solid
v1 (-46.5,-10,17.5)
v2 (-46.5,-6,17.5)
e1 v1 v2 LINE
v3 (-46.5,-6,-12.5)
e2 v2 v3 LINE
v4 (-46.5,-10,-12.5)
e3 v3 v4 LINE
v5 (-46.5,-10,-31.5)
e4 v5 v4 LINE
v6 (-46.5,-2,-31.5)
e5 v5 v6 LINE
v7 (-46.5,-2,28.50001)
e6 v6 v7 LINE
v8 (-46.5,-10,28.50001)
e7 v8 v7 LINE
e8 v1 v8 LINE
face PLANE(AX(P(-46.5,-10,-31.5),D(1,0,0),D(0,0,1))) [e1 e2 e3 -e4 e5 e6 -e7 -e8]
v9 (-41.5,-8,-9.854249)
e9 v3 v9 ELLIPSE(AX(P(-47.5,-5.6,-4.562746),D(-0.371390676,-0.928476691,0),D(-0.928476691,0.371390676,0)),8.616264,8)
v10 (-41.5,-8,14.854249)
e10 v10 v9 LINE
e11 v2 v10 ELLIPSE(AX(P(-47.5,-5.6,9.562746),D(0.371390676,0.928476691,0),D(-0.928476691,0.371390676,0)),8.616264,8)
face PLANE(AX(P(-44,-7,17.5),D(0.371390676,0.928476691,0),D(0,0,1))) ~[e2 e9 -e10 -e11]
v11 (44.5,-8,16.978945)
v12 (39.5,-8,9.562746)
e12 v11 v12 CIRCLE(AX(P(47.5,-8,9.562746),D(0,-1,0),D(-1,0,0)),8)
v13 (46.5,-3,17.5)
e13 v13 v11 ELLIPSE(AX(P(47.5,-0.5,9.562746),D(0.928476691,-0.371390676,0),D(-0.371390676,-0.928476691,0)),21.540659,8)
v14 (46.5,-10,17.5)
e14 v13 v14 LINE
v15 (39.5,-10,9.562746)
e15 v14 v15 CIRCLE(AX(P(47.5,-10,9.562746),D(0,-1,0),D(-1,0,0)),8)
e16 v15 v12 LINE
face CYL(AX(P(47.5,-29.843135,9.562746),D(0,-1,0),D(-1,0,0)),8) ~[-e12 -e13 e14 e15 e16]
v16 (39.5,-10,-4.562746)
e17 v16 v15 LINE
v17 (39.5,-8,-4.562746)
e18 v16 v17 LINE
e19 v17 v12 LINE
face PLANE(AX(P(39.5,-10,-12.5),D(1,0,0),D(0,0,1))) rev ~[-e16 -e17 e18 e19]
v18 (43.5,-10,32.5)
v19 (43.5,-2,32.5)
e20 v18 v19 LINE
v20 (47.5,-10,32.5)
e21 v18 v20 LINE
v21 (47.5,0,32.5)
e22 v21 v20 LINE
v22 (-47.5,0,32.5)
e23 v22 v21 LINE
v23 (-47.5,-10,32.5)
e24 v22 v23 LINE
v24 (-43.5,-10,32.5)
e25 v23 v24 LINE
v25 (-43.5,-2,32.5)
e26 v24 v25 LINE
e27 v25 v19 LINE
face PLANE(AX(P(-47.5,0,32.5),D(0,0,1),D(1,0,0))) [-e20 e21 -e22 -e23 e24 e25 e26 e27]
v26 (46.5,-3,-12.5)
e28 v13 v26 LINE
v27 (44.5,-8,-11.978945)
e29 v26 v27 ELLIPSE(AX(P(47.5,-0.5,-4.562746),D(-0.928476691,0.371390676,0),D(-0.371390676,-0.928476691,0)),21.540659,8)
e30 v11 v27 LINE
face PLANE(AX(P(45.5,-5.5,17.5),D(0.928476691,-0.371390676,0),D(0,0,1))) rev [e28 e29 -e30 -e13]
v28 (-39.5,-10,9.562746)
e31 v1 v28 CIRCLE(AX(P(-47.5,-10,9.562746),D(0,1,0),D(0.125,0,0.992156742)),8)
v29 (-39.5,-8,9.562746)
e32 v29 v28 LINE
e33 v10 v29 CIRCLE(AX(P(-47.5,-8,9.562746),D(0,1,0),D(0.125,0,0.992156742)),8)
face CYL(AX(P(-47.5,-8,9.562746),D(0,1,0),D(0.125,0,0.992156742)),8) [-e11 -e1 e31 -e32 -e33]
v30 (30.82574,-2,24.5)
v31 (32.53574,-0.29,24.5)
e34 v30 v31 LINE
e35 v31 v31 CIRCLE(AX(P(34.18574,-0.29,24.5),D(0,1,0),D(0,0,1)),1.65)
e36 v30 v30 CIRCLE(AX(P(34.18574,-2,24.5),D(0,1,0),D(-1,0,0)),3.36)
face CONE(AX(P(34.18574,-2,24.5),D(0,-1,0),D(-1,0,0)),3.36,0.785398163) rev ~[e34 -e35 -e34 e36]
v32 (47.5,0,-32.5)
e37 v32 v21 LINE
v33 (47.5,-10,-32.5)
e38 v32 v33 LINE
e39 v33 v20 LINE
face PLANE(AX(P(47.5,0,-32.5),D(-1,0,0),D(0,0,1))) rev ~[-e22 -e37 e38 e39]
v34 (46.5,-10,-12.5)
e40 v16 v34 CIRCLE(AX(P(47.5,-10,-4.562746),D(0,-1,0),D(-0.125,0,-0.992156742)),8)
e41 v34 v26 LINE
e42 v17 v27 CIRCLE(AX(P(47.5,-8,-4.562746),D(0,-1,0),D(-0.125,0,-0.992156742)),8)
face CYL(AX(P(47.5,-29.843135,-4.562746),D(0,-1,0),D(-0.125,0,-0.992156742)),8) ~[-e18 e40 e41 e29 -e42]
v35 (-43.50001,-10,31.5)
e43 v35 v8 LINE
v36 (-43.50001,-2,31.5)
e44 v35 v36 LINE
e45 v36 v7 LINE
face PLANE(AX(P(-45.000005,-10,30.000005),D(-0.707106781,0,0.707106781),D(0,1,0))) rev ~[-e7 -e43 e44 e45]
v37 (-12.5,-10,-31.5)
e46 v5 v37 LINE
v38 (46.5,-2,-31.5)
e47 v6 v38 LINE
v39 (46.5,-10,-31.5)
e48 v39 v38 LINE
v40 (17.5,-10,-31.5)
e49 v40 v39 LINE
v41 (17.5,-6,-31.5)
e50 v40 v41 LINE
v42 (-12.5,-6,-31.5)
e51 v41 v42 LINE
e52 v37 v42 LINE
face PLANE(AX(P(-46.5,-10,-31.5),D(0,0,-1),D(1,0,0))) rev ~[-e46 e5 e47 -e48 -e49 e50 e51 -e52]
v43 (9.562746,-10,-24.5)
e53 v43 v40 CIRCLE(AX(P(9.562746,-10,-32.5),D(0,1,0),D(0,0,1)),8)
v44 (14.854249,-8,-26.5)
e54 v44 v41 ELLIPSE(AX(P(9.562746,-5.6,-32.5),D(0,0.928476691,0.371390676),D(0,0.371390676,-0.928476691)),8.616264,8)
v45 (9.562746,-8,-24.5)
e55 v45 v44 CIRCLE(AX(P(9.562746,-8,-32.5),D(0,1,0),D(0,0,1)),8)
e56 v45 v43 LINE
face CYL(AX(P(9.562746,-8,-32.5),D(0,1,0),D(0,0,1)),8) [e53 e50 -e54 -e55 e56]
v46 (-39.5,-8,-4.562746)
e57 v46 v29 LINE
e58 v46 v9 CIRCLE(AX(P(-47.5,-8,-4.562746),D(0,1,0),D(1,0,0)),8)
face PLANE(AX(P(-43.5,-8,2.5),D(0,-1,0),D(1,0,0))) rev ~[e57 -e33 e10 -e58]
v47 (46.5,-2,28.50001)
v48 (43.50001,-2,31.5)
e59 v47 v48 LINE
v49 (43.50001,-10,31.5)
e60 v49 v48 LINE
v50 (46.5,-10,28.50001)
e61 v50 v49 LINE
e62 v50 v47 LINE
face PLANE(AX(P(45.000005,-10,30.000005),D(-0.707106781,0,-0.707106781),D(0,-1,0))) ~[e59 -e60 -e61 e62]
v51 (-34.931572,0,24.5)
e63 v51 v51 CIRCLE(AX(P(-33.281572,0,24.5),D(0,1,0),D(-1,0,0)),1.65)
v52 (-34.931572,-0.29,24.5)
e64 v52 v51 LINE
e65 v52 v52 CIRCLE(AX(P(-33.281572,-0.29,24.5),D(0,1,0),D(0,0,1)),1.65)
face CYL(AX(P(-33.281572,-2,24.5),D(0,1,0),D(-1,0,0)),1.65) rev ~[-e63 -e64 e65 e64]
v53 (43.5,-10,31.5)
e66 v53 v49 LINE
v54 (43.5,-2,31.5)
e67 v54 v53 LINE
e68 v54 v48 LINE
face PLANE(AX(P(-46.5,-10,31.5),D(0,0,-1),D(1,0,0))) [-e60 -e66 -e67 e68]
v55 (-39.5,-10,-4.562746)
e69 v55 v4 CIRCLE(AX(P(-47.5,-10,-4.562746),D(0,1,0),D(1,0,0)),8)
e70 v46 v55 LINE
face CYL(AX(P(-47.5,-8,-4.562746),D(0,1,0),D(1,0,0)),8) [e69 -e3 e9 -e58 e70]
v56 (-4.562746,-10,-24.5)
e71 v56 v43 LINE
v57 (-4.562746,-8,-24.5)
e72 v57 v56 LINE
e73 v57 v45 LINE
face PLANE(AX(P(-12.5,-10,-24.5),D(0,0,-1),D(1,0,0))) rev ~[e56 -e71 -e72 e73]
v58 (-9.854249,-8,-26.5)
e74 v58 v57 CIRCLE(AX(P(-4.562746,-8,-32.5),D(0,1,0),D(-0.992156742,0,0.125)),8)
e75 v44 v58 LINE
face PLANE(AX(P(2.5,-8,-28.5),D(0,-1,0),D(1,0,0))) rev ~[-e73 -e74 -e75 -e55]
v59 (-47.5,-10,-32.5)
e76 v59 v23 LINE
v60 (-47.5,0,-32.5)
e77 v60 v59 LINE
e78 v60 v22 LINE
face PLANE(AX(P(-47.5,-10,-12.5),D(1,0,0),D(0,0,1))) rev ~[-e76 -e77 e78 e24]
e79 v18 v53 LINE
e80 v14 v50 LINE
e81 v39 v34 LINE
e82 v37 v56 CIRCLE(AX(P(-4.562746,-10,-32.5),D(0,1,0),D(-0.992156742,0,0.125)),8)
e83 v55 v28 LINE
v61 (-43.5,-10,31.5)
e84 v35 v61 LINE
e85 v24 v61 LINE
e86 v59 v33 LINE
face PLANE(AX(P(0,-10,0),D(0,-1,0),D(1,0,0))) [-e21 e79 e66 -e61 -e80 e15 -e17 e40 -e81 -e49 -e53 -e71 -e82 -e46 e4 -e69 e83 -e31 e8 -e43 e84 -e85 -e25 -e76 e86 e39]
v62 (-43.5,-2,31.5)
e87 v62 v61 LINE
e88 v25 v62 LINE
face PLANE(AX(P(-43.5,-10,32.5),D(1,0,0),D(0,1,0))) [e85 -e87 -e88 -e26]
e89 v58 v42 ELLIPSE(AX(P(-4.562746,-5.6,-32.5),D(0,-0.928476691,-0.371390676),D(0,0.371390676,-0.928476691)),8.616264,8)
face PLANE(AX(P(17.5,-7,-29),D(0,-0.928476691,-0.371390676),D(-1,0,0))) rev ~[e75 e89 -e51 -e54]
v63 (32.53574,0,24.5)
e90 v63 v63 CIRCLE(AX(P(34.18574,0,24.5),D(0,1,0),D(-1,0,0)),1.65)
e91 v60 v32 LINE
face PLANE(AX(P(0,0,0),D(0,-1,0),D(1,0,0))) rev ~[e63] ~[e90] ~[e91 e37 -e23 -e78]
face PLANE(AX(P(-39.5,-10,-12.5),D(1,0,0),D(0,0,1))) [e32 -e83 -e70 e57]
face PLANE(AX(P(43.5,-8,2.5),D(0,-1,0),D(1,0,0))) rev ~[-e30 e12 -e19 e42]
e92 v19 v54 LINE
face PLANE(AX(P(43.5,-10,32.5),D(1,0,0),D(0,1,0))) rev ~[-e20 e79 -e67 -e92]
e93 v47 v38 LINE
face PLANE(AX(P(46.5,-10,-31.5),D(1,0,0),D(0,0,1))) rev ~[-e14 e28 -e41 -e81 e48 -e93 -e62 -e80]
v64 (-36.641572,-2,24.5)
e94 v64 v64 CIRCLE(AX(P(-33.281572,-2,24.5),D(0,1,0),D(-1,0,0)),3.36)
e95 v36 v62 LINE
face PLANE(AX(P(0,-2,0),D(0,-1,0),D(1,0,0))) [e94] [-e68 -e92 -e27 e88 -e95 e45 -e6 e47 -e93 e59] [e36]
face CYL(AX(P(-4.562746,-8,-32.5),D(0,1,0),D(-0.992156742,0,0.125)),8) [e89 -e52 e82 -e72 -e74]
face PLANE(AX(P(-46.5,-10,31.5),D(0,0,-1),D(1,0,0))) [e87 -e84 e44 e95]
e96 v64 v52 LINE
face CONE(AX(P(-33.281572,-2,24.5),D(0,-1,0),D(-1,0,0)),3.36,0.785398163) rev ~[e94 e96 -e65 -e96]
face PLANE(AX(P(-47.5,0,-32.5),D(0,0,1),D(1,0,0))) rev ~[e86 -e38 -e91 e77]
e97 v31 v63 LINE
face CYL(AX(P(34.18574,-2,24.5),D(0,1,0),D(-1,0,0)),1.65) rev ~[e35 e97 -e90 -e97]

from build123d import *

# Parameters (mm, degrees)
F0_W            = 95
F0_H            = 65
F1_DEPTH        = 10
F2_W            = 93
F2_H            = 63
F3_DEPTH        = 8
F4_W            = 8
F4_H            = 30
F4_W_2          = 30
F4_H_2          = 8
F5_DEPTH        = 2
F6_T1_DEPTH     = 21.843134833
F6_T6_DEPTH     = 41.686269666
F6_T11_DEPTH    = 41.686269666
F7_C1_SIZE2     = 2
F7_C1_SIZE      = 5
F7_C2_SIZE2     = 5
F7_C2_SIZE      = 2
F7_C3_SIZE2     = 2
F7_C3_SIZE      = 5
F8_W            = 87
F8_H            = 8
F9_DEPTH        = 10
F10_SIZE        = 2.99999
F12_D           = 3.3
F12_CSINK_D     = 6.72
F12_CSINK_ANGLE = 90


# Not quite as in the source:
# - a fillet or chamfer that OpenCascade refuses, or shapes differently, is made with other operations: its cross-section is extruded or revolved along the edge and cut away or added
# - a fillet or chamfer is up to 0.001 mm smaller than in the source, because OpenCascade refuses the exact size


with BuildPart() as f1:
    # F0 (on Front) → F1 (new body)
    with BuildSketch(Plane.XZ):
        Rectangle(F0_W, F0_H)
    extrude(amount=F1_DEPTH)

    # F2 (on face) → F3 (cut)
    with BuildSketch(Plane.XZ.offset(10)):
        Rectangle(F2_W, F2_H)
    extrude(amount=-F3_DEPTH, mode=Mode.SUBTRACT)

    # F4 (on face) → F5 (join)
    with BuildSketch(Plane.XZ.offset(10)):
        with Locations((-43.5, 2.5)):
            Rectangle(F4_W, F4_H)
        with Locations((43.5, 2.5)):
            Rectangle(F4_W, F4_H)
        with Locations((2.5, -28.5)):
            Rectangle(F4_W_2, F4_H_2)
    extrude(amount=-F5_DEPTH)

    # F6: fillet of radius 8 on 6 edges, made by hand

    # F6_s2 → F6_t1 (cut)
    with BuildSketch(Plane.XZ.offset(8)):
        with BuildLine():
            ThreePointArc((-39.5, -4.5627460668), (-41.5, -9.8542486889), (-46.5, -12.5))
            Line((-46.5, -12.5), (-39.5, -12.5))
            Line((-39.5, -12.5), (-39.5, -4.5627460668))
        make_face()
        with BuildLine():
            ThreePointArc((-46.5, 17.5), (-41.5, 14.8542486889), (-39.5, 9.5627460668))
            Line((-39.5, 9.5627460668), (-39.5, 17.5))
            Line((-39.5, 17.5), (-46.5, 17.5))
        make_face()
        with BuildLine():
            ThreePointArc((-12.5, -31.5), (-9.8542486889, -26.5), (-4.5627460668, -24.5))
            Line((-4.5627460668, -24.5), (-12.5, -24.5))
            Line((-12.5, -24.5), (-12.5, -31.5))
        make_face()
        with BuildLine():
            ThreePointArc((9.5627460668, -24.5), (14.8542486889, -26.5), (17.5, -31.5))
            Line((17.5, -31.5), (17.5, -24.5))
            Line((17.5, -24.5), (9.5627460668, -24.5))
        make_face()
    extrude(amount=F6_T1_DEPTH, mode=Mode.SUBTRACT)


with BuildPart() as f6_tool4:
    # F6_s5 → F6_t6 (new body)
    with BuildSketch(Plane.XZ.offset(29.843134833)):
        with BuildLine():
            ThreePointArc((39.5, 9.5627460668), (41.5, 14.8542486889), (46.5, 17.5))
            Line((46.5, 17.5), (39.5, 17.5))
            Line((39.5, 17.5), (39.5, 9.5627460668))
        make_face()
    extrude(amount=-F6_T6_DEPTH)

    split(bisect_by=Plane.XZ.offset(2), keep=Keep.TOP)


with BuildPart() as f1_1:
    add(f1.part)

    # F6_t3: cut F6_tool4
    add(f6_tool4.part, mode=Mode.SUBTRACT)


with BuildPart() as f6_tool9:
    # F6_s10 → F6_t11 (new body)
    with BuildSketch(Plane.XZ.offset(29.843134833)):
        with BuildLine():
            ThreePointArc((46.5, -12.5), (41.5, -9.8542486889), (39.5, -4.5627460668))
            Line((39.5, -4.5627460668), (39.5, -12.5))
            Line((39.5, -12.5), (46.5, -12.5))
        make_face()
    extrude(amount=-F6_T11_DEPTH)

    split(bisect_by=Plane.XZ.offset(2), keep=Keep.TOP)


with BuildPart() as f1_2:
    add(f1_1.part)

    # F6_t8: cut F6_tool9
    add(f6_tool9.part, mode=Mode.SUBTRACT)

    # F7: chamfer of 2 x 5 on 3 edges, made by hand

    # F7_c1
    f7_c1_edges = [f1_2.edges().sort_by_distance(p)[0] for p in [
        (2.5, -8, -31.5),
    ]]
    f7_c1_side = f1_2.faces().sort_by_distance((2.5, -8, -31.46))[0]
    chamfer(f7_c1_edges, length=F7_C1_SIZE, length2=F7_C1_SIZE2, reference=f7_c1_side)

    # F7_c2
    f7_c2_edges = [f1_2.edges().sort_by_distance(p)[0] for p in [
        (-46.5, -8, 2.5),
    ]]
    f7_c2_side = f1_2.faces().sort_by_distance((-46.5, -7.96, 2.5))[0]
    chamfer(f7_c2_edges, length=F7_C2_SIZE, length2=F7_C2_SIZE2, reference=f7_c2_side)

    # F7_c3
    f7_c3_edges = [f1_2.edges().sort_by_distance(p)[0] for p in [
        (46.5, -8, 2.5),
    ]]
    f7_c3_side = f1_2.faces().sort_by_distance((46.5, -7.96, 2.5))[0]
    chamfer(f7_c3_edges, length=F7_C3_SIZE, length2=F7_C3_SIZE2, reference=f7_c3_side)

    # F8 (on face) → F9 (cut)
    with BuildSketch(Plane.XY.offset(32.5)):
        with Locations((0, -6)):
            Rectangle(F8_W, F8_H)
    extrude(amount=-F9_DEPTH, mode=Mode.SUBTRACT)

    # F10 (size 3 in the source; OpenCascade refuses exactly that, so slightly less here)
    f10_edges = [f1_2.edges().sort_by_distance(p)[0] for p in [
        (-46.5, -6, 31.5),
        (46.5, -6, 31.5),
    ]]
    chamfer(f10_edges, length=F10_SIZE)

    # F12 (through all)
    with Locations(Plane.XZ.offset(2)):
        with Locations((34.1857404726, 24.5), (-33.2815715389, 24.5)):
            CounterSinkHole(F12_D / 2, F12_CSINK_D / 2, counter_sink_angle=F12_CSINK_ANGLE)


solid = f1_2.part
